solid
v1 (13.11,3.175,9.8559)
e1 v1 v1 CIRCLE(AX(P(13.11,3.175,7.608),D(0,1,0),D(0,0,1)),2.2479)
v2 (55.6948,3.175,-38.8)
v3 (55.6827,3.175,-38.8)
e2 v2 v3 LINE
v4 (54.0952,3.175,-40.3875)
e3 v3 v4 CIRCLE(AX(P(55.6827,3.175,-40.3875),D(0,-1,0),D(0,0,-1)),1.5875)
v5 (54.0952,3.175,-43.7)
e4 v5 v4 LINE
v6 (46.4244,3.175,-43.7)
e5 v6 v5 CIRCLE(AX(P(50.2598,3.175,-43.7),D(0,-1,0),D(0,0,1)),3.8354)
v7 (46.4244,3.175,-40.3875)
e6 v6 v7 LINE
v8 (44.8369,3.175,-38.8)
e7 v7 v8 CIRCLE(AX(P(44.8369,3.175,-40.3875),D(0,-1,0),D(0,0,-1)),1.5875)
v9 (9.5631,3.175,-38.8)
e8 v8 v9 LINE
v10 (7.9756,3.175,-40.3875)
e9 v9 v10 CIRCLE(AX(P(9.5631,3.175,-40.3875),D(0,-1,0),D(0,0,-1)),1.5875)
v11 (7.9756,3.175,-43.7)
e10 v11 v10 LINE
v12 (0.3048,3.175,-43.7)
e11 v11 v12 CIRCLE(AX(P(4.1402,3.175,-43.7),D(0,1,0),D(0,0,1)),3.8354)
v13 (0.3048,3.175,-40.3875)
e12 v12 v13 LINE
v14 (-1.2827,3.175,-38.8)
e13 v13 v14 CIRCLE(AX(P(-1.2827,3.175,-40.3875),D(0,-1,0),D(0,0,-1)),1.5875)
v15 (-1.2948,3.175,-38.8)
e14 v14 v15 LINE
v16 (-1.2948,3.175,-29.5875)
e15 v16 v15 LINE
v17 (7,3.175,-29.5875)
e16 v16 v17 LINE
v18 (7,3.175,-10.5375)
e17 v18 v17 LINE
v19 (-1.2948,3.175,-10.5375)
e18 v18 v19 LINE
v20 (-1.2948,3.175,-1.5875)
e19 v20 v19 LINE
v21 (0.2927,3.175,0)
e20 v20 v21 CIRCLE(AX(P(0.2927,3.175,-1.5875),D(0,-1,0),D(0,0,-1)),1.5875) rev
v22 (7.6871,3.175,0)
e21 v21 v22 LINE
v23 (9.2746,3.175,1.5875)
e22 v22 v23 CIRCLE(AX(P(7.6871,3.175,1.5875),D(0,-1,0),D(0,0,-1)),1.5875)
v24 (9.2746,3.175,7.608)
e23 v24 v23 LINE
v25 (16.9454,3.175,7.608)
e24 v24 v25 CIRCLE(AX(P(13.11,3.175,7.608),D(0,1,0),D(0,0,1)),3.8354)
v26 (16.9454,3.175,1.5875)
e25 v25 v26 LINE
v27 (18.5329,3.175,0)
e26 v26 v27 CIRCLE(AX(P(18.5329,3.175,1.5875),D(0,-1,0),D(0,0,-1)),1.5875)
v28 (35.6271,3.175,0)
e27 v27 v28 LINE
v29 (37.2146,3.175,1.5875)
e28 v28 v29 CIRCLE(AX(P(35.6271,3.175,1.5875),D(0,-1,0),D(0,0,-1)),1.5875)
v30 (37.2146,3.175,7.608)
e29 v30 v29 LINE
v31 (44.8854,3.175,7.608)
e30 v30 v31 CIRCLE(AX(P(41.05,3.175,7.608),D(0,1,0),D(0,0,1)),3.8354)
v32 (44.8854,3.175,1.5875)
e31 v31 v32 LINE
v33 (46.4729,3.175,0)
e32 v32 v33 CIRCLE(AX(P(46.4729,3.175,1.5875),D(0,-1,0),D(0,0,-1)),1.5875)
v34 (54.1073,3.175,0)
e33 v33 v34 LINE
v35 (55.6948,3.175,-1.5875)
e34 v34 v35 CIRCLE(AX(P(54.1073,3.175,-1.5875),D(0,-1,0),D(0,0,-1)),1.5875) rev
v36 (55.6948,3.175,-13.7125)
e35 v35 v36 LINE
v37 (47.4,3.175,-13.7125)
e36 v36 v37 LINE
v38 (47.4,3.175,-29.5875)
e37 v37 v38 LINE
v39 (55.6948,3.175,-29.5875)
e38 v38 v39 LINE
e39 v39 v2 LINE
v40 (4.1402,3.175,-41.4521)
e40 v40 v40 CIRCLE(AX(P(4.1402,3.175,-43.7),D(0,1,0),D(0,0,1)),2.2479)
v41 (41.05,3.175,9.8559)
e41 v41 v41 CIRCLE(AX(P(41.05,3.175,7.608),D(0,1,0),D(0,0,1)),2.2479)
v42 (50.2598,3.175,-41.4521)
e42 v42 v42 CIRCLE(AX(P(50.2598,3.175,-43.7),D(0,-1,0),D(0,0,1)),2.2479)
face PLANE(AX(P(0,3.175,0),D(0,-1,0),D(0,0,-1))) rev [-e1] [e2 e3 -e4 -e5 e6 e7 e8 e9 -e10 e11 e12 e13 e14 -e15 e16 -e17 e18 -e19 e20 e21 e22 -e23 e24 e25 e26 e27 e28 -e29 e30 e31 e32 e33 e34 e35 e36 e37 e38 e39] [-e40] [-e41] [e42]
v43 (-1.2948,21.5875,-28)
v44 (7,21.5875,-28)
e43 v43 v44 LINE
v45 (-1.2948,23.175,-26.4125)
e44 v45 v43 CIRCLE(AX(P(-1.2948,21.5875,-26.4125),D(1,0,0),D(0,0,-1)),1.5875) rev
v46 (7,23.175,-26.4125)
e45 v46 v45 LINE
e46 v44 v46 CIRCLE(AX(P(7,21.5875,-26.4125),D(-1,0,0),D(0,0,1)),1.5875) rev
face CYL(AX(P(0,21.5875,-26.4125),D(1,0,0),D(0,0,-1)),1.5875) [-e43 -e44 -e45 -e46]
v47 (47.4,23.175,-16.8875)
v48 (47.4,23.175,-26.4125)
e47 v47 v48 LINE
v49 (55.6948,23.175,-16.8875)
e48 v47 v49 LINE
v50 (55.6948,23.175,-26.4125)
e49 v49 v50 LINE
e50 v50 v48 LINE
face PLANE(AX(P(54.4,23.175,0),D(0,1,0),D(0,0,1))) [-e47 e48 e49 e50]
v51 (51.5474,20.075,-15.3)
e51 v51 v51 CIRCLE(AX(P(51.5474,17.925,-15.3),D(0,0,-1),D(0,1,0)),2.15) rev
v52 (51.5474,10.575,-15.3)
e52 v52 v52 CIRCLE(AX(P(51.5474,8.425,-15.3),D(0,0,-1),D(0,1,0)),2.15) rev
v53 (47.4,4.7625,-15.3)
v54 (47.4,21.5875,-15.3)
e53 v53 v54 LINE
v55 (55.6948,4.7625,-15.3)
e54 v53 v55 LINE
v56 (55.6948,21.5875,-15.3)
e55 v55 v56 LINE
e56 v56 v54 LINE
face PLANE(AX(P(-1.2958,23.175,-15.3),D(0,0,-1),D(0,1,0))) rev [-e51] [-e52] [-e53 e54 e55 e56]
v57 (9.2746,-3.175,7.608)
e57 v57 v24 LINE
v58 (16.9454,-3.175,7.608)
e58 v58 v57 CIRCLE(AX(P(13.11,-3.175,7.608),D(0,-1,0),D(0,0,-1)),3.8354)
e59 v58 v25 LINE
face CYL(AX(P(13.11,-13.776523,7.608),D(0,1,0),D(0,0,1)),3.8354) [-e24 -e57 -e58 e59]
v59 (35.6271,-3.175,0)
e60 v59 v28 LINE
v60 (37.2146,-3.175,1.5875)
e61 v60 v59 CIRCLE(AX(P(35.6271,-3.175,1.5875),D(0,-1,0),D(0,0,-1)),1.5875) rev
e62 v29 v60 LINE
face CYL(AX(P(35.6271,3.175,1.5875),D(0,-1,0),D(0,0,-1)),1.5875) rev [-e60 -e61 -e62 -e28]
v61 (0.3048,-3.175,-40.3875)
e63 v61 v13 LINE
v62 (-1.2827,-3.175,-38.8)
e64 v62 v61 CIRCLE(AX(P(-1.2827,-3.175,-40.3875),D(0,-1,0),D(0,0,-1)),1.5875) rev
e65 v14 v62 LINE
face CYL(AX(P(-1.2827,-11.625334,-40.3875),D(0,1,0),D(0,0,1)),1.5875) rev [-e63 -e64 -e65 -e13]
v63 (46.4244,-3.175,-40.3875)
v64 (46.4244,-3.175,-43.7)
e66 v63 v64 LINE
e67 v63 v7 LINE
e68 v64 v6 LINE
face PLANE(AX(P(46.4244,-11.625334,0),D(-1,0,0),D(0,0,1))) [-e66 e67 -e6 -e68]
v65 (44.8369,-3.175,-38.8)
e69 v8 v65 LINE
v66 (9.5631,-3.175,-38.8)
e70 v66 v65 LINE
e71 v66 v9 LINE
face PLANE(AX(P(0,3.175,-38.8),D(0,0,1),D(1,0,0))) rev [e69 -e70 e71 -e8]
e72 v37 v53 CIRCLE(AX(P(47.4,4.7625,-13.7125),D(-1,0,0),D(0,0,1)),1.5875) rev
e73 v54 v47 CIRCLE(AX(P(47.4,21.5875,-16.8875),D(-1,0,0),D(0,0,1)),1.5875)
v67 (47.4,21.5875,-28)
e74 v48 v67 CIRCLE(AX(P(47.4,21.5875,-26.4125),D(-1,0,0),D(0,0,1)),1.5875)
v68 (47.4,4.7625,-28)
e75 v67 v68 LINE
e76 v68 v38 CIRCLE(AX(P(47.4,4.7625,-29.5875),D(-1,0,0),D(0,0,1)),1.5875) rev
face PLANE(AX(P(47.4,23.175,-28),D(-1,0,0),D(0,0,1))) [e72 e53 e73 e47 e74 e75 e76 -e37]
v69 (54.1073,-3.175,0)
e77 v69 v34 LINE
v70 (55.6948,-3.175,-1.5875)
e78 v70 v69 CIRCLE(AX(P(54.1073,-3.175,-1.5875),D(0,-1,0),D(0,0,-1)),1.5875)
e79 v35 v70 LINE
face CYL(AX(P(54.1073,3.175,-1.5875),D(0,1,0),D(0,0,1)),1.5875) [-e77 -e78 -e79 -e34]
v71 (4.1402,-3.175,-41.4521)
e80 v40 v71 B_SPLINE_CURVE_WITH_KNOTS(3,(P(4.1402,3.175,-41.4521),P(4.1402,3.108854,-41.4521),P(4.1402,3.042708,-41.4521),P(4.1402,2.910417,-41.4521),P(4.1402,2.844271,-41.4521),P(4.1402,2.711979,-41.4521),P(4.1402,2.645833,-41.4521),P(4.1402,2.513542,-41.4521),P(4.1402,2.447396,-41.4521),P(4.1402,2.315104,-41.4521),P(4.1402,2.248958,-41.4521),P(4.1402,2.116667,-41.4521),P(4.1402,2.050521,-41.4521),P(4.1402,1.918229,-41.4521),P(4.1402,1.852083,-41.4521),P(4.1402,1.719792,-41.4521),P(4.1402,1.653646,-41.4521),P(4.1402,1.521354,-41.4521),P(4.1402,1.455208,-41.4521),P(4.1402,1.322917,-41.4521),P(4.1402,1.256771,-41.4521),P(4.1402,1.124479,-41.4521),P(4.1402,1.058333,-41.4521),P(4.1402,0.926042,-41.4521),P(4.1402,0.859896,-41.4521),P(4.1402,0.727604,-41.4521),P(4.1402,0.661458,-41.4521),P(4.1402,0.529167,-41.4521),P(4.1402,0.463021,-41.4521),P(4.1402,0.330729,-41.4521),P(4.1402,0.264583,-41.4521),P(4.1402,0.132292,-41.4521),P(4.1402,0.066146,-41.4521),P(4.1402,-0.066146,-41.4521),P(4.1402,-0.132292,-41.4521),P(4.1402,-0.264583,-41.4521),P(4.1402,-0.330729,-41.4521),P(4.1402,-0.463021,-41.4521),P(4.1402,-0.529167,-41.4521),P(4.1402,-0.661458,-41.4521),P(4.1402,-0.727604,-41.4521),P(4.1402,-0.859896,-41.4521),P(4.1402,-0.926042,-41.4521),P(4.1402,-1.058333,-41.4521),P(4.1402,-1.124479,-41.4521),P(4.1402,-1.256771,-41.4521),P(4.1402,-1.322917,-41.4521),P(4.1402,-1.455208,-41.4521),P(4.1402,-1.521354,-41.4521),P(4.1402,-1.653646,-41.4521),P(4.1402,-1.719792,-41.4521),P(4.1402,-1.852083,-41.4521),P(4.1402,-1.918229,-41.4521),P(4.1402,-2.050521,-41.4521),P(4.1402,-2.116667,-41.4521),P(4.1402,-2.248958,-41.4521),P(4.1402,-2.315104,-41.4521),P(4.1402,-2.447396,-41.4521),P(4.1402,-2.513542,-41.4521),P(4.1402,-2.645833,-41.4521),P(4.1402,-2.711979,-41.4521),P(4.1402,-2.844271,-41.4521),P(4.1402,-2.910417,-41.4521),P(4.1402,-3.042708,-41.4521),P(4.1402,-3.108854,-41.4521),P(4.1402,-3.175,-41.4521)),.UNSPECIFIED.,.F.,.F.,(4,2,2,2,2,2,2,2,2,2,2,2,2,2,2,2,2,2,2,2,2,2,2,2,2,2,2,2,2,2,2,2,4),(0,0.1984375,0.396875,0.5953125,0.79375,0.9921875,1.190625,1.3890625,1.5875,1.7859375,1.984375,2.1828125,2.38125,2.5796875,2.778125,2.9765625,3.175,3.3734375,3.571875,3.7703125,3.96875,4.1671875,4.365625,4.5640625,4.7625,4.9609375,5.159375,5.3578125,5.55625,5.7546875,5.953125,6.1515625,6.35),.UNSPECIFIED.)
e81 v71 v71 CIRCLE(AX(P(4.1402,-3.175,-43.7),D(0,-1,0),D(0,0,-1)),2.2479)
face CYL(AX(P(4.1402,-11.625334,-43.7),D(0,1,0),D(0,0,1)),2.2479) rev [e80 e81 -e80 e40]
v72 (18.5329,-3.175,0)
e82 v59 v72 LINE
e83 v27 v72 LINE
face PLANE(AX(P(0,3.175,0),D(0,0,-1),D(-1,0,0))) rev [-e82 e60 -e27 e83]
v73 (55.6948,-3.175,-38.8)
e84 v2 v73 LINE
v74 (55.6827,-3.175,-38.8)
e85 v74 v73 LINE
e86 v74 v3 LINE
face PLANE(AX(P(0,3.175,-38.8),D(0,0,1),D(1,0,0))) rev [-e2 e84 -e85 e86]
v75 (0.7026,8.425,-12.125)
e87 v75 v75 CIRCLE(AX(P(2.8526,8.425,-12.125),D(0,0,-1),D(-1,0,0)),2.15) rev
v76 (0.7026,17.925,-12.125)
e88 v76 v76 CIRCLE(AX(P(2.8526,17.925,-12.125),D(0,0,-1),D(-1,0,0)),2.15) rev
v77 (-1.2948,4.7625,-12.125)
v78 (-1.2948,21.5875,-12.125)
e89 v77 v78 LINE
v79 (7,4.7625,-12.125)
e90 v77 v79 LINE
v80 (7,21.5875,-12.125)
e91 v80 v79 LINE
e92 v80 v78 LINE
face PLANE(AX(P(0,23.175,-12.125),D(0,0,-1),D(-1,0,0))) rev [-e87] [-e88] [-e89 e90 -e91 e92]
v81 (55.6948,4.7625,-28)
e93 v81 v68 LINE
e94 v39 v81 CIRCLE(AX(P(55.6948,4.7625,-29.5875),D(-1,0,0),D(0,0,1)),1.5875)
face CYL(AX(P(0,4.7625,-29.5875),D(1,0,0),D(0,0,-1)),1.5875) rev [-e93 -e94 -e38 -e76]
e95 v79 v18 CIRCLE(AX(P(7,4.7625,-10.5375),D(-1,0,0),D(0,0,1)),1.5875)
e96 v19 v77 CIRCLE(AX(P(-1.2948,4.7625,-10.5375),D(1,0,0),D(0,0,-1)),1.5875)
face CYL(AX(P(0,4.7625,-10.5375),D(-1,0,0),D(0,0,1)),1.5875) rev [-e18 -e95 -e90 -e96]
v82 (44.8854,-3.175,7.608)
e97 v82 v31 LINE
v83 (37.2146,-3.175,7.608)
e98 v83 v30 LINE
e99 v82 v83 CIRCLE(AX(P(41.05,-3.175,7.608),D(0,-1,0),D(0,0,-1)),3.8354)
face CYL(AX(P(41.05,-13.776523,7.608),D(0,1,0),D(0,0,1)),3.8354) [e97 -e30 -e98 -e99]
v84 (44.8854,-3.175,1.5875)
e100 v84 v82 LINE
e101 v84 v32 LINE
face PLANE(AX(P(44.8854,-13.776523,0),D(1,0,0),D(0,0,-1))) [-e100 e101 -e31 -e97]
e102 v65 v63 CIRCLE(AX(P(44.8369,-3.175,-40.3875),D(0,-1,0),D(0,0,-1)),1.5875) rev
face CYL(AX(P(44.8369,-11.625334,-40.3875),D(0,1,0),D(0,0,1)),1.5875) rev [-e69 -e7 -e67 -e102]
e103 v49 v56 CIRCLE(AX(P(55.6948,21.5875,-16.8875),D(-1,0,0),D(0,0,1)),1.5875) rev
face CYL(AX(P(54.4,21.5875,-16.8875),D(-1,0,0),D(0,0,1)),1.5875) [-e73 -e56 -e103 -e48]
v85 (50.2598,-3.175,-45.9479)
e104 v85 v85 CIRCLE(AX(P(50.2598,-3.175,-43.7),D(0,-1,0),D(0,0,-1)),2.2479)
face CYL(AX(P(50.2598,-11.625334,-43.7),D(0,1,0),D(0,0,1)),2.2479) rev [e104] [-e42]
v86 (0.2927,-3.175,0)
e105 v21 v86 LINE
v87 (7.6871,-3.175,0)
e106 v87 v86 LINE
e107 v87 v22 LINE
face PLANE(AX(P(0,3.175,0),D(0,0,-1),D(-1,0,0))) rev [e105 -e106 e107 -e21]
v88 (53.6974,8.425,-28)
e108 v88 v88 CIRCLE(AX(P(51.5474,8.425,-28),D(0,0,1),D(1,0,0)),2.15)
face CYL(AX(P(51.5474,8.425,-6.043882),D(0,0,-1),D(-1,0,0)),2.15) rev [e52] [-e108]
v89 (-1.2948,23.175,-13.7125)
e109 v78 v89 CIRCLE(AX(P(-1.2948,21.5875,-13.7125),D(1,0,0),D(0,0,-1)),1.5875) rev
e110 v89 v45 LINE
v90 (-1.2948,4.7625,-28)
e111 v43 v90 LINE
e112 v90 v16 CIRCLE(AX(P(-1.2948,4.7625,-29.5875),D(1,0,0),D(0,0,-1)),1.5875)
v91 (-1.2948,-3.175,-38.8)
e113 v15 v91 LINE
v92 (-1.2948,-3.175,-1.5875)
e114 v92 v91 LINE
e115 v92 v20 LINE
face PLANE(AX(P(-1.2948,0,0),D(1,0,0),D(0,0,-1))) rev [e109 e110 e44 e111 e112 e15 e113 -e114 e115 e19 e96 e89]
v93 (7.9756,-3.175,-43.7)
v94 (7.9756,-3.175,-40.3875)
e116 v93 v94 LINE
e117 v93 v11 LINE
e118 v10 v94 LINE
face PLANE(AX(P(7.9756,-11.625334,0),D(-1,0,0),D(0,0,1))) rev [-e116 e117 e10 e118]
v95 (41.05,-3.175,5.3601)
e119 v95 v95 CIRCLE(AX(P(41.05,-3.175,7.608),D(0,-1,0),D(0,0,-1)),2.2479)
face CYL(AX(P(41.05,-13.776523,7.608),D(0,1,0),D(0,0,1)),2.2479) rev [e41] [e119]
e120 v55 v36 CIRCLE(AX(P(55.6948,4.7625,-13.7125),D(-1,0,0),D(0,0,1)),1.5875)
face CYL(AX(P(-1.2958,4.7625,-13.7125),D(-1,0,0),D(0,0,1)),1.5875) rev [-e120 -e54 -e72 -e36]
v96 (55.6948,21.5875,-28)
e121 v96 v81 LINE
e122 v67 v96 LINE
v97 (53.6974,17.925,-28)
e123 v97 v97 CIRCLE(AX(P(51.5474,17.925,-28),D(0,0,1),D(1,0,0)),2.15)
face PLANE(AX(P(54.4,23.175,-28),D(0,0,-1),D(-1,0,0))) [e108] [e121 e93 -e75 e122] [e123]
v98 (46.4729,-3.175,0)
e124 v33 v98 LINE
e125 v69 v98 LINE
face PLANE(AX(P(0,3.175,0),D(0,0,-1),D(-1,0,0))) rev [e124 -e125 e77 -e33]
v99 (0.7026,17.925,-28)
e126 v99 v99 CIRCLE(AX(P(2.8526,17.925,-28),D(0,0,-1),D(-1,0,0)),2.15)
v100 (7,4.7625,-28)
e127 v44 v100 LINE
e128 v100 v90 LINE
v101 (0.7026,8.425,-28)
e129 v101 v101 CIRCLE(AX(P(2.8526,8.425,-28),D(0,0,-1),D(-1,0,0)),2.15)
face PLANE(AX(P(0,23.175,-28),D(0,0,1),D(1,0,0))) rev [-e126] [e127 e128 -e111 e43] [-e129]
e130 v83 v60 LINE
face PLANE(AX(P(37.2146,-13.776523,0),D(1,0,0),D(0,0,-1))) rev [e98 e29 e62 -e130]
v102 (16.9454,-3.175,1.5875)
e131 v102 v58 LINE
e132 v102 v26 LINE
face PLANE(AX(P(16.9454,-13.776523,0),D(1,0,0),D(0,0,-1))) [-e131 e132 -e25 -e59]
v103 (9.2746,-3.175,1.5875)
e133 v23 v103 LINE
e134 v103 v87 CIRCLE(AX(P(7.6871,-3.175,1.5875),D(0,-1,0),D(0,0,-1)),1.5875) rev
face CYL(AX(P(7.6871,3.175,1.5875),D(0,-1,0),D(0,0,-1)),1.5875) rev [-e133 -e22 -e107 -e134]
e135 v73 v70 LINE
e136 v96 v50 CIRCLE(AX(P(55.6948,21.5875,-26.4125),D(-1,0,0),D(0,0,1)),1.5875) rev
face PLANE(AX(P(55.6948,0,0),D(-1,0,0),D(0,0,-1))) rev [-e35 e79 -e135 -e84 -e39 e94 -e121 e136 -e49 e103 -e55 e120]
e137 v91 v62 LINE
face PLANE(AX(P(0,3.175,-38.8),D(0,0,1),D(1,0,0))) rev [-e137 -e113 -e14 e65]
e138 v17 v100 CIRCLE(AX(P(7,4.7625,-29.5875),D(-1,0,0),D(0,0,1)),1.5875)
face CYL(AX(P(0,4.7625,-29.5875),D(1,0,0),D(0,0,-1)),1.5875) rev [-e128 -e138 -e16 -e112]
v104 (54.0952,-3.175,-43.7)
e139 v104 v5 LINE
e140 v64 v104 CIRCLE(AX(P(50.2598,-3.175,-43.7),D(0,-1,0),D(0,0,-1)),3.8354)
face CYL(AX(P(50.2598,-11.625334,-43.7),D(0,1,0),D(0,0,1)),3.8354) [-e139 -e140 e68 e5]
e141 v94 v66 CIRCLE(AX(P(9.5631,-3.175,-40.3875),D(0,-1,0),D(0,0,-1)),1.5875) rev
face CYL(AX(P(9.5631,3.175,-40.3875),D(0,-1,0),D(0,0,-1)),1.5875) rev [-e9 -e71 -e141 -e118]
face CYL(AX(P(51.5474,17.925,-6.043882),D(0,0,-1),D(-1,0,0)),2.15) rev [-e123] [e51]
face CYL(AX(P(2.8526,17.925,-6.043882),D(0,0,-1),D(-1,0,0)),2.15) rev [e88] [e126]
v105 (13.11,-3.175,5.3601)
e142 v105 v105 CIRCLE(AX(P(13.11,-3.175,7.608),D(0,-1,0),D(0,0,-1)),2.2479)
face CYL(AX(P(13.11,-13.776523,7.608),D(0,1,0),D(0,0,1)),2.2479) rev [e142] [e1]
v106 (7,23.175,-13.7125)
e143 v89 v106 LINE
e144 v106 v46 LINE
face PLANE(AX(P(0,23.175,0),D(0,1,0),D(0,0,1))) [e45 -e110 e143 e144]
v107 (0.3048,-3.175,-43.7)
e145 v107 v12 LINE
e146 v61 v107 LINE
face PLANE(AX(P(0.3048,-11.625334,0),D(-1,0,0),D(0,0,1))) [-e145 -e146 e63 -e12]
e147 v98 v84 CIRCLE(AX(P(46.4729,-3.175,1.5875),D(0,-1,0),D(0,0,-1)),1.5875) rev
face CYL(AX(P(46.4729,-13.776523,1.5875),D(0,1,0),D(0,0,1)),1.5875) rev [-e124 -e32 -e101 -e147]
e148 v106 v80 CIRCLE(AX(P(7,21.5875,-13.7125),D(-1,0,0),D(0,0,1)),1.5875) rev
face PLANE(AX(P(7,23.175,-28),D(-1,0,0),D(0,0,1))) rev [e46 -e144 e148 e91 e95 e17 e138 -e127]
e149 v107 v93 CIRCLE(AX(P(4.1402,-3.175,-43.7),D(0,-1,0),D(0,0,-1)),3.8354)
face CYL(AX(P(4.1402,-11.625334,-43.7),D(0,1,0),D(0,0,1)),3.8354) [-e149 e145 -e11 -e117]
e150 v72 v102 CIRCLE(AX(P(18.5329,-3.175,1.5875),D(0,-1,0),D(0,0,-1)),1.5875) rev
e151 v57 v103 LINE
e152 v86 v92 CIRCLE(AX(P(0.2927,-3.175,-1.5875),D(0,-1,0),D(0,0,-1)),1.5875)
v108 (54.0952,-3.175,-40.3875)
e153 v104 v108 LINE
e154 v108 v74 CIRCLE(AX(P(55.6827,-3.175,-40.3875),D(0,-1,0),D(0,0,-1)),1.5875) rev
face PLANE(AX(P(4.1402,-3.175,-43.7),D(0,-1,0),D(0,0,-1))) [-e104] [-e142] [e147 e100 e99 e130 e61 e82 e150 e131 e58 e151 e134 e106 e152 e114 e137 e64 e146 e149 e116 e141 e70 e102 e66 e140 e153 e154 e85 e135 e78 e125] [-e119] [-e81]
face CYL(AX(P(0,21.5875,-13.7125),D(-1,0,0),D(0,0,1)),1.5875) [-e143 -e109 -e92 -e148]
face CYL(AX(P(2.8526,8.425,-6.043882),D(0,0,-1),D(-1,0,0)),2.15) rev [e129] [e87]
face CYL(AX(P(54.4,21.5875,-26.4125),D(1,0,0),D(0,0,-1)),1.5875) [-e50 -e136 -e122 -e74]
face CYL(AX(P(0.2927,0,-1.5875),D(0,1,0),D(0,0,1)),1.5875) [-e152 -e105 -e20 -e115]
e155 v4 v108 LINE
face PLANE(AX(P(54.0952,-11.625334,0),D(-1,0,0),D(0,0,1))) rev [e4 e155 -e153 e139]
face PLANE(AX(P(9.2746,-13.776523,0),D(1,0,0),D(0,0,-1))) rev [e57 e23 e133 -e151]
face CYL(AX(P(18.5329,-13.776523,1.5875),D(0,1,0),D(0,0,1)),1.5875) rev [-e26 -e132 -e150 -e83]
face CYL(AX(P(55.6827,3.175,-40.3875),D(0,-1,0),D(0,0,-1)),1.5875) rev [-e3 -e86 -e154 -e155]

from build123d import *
from build123d.topology import SkipClean

# Parameters (mm, degrees)
SKETCH1_W           = 54.4
SKETCH1_H           = 38.8
BOSS_EXTRUDE1_DEPTH = 3.175
SKETCH2_W           = 7
SKETCH2_H           = 15.875
BOSS_EXTRUDE2_DEPTH = 20
SKETCH3_R           = 3.8354
SKETCH3_R_2         = 2.2479
BOSS_EXTRUDE3_DEPTH = 3.175
LPATTERN1_COUNT     = 2
LPATTERN1_PITCH     = 27.94
SKETCH6_R           = 3.8354
SKETCH6_R_2         = 2.2479
BOSS_EXTRUDE6_DEPTH = 3.175
SKETCH7_R           = 2.150000018
CUT_EXTRUDE1_DEPTH  = 15.875
BOSS_EXTRUDE7_DEPTH = 1.2948
SKETCH11_R          = 2.2479
BOSS_EXTRUDE8_DEPTH = 3.175
CUT_EXTRUDE2_REACH  = 79.746
SKETCH13_W          = 3.175
SKETCH13_H          = 20
FILLET1_R           = 1.5875


with BuildPart() as part:
    # Sketch1 → Boss-Extrude1 (new body)
    with BuildSketch(Plane(origin=(0, 0, 0), x_dir=(1, 0, 0), z_dir=(0, 1, 0))):
        with Locations((27.2, 19.4)):
            Rectangle(SKETCH1_W, SKETCH1_H)
    extrude(amount=BOSS_EXTRUDE1_DEPTH)

    # Sketch2 → Boss-Extrude2 (add)
    with BuildSketch(Plane(origin=(0, 3.175, 0), x_dir=(1, 0, 0), z_dir=(0, 1, 0))):
        with Locations((3.5, 20.0625)):
            Rectangle(SKETCH2_W, SKETCH2_H)
    boss_extrude2 = extrude(amount=BOSS_EXTRUDE2_DEPTH)

    # Mirror1: Boss-Extrude2 across plane
    add(boss_extrude2.mirror(Plane.ZY.offset(-27.2)))

    # Sketch3 → Boss-Extrude3 (add)
    # profile 1 of 2: a face of its own
    with BuildSketch(Plane(origin=(0, 3.175, 0), x_dir=(1, 0, 0), z_dir=(0, 1, 0))):
        with Locations((13.109999942, -7.608)):
            Circle(SKETCH3_R)
        with Locations(Location((13.109999942, -7.608, 0), (0, 0, 270))):
            Circle(SKETCH3_R_2, mode=Mode.SUBTRACT)
    # profile 2 of 2: a face of its own
    with BuildSketch(Plane(origin=(0, 3.175, 0), x_dir=(1, 0, 0), z_dir=(0, 1, 0))):
        with BuildLine():
            Line((9.274599942, 0), (9.274599942, -7.608))
            ThreePointArc((9.274599942, -7.608), (13.109999942, -3.7726), (16.945399942, -7.608))
            Line((16.945399942, -7.608), (16.945399942, 0))
            Line((16.945399942, 0), (9.274599942, 0))
        make_face()
    boss_extrude3 = extrude(amount=-BOSS_EXTRUDE3_DEPTH)

    # LPattern1: Boss-Extrude3 ×2
    with Locations(*[(i * LPATTERN1_PITCH, 0, 0) for i in range(1, LPATTERN1_COUNT)]):
        add(boss_extrude3)

    # Sketch6 → Boss-Extrude6 (add)
    # profile 1 of 2: a face of its own
    with BuildSketch(Plane(origin=(0, 3.175, 0), x_dir=(1, 0, 0), z_dir=(0, 1, 0))):
        with Locations((4.1402, 43.7)):
            Circle(SKETCH6_R)
        with Locations(Location((4.1402, 43.7, 0), (0, 0, 270))):
            Circle(SKETCH6_R_2, mode=Mode.SUBTRACT)
    # profile 2 of 2: a face of its own
    with BuildSketch(Plane(origin=(0, 3.175, 0), x_dir=(1, 0, 0), z_dir=(0, 1, 0))):
        with BuildLine():
            ThreePointArc((7.9756, 43.7), (4.1402, 39.8646), (0.3048, 43.7))
            Line((0.3048, 43.7), (0.3048, 38.8))
            Line((0.3048, 38.8), (7.9756, 38.8))
            Line((7.9756, 38.8), (7.9756, 43.7))
        make_face()
    boss_extrude6 = extrude(amount=-BOSS_EXTRUDE6_DEPTH)

    # Mirror3: Boss-Extrude6 across plane
    add(boss_extrude6.mirror(Plane.ZY.offset(-27.2)))

    # Sketch7 → Cut-Extrude1 (cut)
    with BuildSketch(Plane(origin=(0, 0, -28), x_dir=(-1, 0, 0), z_dir=(0, 0, -1))):
        with Locations((-2.852600116, 17.925)):
            Circle(SKETCH7_R)
        with Locations((-2.852600116, 8.425)):
            Circle(SKETCH7_R)
    cut_extrude1 = extrude(amount=-CUT_EXTRUDE1_DEPTH, mode=Mode.SUBTRACT)

    # Sketch9 → Boss-Extrude7 (add)
    with BuildSketch(Plane.ZY):
        Polygon((-38.8, 0), (-38.8, 3.175), (-28, 3.175), (-28, 23.175), (-12.125, 23.175), (-12.125, 3.175), (0, 3.175), (0, 0), align=None)
    boss_extrude7 = extrude(amount=BOSS_EXTRUDE7_DEPTH)

    # Mirror4: Boss-Extrude7 across plane
    add(boss_extrude7.mirror(Plane.ZY.offset(-27.2)))

    # Mirror5: Cut-Extrude1 across plane
    add(cut_extrude1.mirror(Plane.ZY.offset(-27.2)), mode=Mode.SUBTRACT)

    # Sketch11 → Boss-Extrude8 (add)
    with SkipClean():  # the faces are left unmerged after this step: merging them gives an invalid solid
        with BuildSketch(Plane.XZ):
            with BuildLine():
                Line((0.3048, -38.8), (0.3048, -43.7))
                ThreePointArc((0.3048, -43.7), (4.1402, -47.5354), (7.9756, -43.7))
                Line((7.9756, -43.7), (7.9756, -38.8))
                Line((7.9756, -38.8), (46.4244, -38.8))
                Line((46.4244, -38.8), (46.4244, -43.7))
                ThreePointArc((46.4244, -43.7), (50.2598, -47.5354), (54.0952, -43.7))
                Line((54.0952, -43.7), (54.0952, -38.8))
                Line((54.0952, -38.8), (55.6948, -38.8))
                Line((55.6948, -38.8), (55.6948, 0))
                Line((55.6948, 0), (44.885399942, 0))
                Line((44.885399942, 0), (44.885399942, 7.608))
                ThreePointArc((44.885399942, 7.608), (41.049999942, 11.4434), (37.214599942, 7.608))
                Line((37.214599942, 7.608), (37.214599942, 0))
                Line((37.214599942, 0), (16.945399942, 0))
                Line((16.945399942, 0), (16.945399942, 7.608))
                ThreePointArc((16.945399942, 7.608), (13.109999942, 11.4434), (9.274599942, 7.608))
                Line((9.274599942, 7.608), (9.274599942, 0))
                Line((9.274599942, 0), (-1.2948, 0))
                Line((-1.2948, 0), (-1.2948, -38.8))
                Line((-1.2948, -38.8), (0.3048, -38.8))
            make_face()
            with Locations(Location((4.1402, -43.7, 0), (0, 0, 90))):
                Circle(SKETCH11_R, mode=Mode.SUBTRACT)
            with Locations(Location((50.2598, -43.7, 0), (0, 0, 90))):
                Circle(SKETCH11_R, mode=Mode.SUBTRACT)
            with Locations(Location((41.049999942, 7.608, 0), (0, 0, 90))):
                Circle(SKETCH11_R, mode=Mode.SUBTRACT)
            with Locations(Location((13.109999942, 7.608, 0), (0, 0, 90))):
                Circle(SKETCH11_R, mode=Mode.SUBTRACT)
        extrude(amount=BOSS_EXTRUDE8_DEPTH)
    add(part.part.scale(1), mode=Mode.REPLACE)  # the faces are merged on a copy

    # Sketch13 → Cut-Extrude2 (cut, up to next)
    with BuildSketch(Plane(origin=(55.6948, 0, 0), x_dir=(0, 0, -1), z_dir=(1, 0, 0)), mode=Mode.PRIVATE) as cut_extrude2_sk1:
        with Locations((13.7125, 13.175)):
            Rectangle(SKETCH13_W, SKETCH13_H)
    cut_extrude2_tool1 = extrude(cut_extrude2_sk1.sketch, amount=-CUT_EXTRUDE2_REACH, mode=Mode.PRIVATE) & part.part
    add(cut_extrude2_tool1.solids().sort_by_distance((55.6948, 13.175, -13.7125))[0], mode=Mode.SUBTRACT)

    # Fillet1
    fillet1_edges = [part.edges().sort_by_distance(p)[0] for p in [
        (-1.2948, 0, 0),
        (55.6948, 0, 0),
        (2.8526, 3.175, -12.125),
        (2.8526, 3.175, -28),
        (2.8526, 23.175, -12.125),
        (2.8526, 23.175, -28),
        (51.5474, 23.175, -15.3),
        (51.5474, 3.175, -15.3),
        (51.5474, 23.175, -28),
        (51.5474, 3.175, -28),
        (16.945399942, 0, 0),
        (9.274599942, 0, 0),
        (44.885399942, 0, 0),
        (37.214599942, 0, 0),
        (0.3048, 0, -38.8),
        (7.9756, 0, -38.8),
        (46.4244, 0, -38.8),
        (54.0952, 0, -38.8),
    ]]
    fillet(fillet1_edges, radius=FILLET1_R)


solid = part.part
